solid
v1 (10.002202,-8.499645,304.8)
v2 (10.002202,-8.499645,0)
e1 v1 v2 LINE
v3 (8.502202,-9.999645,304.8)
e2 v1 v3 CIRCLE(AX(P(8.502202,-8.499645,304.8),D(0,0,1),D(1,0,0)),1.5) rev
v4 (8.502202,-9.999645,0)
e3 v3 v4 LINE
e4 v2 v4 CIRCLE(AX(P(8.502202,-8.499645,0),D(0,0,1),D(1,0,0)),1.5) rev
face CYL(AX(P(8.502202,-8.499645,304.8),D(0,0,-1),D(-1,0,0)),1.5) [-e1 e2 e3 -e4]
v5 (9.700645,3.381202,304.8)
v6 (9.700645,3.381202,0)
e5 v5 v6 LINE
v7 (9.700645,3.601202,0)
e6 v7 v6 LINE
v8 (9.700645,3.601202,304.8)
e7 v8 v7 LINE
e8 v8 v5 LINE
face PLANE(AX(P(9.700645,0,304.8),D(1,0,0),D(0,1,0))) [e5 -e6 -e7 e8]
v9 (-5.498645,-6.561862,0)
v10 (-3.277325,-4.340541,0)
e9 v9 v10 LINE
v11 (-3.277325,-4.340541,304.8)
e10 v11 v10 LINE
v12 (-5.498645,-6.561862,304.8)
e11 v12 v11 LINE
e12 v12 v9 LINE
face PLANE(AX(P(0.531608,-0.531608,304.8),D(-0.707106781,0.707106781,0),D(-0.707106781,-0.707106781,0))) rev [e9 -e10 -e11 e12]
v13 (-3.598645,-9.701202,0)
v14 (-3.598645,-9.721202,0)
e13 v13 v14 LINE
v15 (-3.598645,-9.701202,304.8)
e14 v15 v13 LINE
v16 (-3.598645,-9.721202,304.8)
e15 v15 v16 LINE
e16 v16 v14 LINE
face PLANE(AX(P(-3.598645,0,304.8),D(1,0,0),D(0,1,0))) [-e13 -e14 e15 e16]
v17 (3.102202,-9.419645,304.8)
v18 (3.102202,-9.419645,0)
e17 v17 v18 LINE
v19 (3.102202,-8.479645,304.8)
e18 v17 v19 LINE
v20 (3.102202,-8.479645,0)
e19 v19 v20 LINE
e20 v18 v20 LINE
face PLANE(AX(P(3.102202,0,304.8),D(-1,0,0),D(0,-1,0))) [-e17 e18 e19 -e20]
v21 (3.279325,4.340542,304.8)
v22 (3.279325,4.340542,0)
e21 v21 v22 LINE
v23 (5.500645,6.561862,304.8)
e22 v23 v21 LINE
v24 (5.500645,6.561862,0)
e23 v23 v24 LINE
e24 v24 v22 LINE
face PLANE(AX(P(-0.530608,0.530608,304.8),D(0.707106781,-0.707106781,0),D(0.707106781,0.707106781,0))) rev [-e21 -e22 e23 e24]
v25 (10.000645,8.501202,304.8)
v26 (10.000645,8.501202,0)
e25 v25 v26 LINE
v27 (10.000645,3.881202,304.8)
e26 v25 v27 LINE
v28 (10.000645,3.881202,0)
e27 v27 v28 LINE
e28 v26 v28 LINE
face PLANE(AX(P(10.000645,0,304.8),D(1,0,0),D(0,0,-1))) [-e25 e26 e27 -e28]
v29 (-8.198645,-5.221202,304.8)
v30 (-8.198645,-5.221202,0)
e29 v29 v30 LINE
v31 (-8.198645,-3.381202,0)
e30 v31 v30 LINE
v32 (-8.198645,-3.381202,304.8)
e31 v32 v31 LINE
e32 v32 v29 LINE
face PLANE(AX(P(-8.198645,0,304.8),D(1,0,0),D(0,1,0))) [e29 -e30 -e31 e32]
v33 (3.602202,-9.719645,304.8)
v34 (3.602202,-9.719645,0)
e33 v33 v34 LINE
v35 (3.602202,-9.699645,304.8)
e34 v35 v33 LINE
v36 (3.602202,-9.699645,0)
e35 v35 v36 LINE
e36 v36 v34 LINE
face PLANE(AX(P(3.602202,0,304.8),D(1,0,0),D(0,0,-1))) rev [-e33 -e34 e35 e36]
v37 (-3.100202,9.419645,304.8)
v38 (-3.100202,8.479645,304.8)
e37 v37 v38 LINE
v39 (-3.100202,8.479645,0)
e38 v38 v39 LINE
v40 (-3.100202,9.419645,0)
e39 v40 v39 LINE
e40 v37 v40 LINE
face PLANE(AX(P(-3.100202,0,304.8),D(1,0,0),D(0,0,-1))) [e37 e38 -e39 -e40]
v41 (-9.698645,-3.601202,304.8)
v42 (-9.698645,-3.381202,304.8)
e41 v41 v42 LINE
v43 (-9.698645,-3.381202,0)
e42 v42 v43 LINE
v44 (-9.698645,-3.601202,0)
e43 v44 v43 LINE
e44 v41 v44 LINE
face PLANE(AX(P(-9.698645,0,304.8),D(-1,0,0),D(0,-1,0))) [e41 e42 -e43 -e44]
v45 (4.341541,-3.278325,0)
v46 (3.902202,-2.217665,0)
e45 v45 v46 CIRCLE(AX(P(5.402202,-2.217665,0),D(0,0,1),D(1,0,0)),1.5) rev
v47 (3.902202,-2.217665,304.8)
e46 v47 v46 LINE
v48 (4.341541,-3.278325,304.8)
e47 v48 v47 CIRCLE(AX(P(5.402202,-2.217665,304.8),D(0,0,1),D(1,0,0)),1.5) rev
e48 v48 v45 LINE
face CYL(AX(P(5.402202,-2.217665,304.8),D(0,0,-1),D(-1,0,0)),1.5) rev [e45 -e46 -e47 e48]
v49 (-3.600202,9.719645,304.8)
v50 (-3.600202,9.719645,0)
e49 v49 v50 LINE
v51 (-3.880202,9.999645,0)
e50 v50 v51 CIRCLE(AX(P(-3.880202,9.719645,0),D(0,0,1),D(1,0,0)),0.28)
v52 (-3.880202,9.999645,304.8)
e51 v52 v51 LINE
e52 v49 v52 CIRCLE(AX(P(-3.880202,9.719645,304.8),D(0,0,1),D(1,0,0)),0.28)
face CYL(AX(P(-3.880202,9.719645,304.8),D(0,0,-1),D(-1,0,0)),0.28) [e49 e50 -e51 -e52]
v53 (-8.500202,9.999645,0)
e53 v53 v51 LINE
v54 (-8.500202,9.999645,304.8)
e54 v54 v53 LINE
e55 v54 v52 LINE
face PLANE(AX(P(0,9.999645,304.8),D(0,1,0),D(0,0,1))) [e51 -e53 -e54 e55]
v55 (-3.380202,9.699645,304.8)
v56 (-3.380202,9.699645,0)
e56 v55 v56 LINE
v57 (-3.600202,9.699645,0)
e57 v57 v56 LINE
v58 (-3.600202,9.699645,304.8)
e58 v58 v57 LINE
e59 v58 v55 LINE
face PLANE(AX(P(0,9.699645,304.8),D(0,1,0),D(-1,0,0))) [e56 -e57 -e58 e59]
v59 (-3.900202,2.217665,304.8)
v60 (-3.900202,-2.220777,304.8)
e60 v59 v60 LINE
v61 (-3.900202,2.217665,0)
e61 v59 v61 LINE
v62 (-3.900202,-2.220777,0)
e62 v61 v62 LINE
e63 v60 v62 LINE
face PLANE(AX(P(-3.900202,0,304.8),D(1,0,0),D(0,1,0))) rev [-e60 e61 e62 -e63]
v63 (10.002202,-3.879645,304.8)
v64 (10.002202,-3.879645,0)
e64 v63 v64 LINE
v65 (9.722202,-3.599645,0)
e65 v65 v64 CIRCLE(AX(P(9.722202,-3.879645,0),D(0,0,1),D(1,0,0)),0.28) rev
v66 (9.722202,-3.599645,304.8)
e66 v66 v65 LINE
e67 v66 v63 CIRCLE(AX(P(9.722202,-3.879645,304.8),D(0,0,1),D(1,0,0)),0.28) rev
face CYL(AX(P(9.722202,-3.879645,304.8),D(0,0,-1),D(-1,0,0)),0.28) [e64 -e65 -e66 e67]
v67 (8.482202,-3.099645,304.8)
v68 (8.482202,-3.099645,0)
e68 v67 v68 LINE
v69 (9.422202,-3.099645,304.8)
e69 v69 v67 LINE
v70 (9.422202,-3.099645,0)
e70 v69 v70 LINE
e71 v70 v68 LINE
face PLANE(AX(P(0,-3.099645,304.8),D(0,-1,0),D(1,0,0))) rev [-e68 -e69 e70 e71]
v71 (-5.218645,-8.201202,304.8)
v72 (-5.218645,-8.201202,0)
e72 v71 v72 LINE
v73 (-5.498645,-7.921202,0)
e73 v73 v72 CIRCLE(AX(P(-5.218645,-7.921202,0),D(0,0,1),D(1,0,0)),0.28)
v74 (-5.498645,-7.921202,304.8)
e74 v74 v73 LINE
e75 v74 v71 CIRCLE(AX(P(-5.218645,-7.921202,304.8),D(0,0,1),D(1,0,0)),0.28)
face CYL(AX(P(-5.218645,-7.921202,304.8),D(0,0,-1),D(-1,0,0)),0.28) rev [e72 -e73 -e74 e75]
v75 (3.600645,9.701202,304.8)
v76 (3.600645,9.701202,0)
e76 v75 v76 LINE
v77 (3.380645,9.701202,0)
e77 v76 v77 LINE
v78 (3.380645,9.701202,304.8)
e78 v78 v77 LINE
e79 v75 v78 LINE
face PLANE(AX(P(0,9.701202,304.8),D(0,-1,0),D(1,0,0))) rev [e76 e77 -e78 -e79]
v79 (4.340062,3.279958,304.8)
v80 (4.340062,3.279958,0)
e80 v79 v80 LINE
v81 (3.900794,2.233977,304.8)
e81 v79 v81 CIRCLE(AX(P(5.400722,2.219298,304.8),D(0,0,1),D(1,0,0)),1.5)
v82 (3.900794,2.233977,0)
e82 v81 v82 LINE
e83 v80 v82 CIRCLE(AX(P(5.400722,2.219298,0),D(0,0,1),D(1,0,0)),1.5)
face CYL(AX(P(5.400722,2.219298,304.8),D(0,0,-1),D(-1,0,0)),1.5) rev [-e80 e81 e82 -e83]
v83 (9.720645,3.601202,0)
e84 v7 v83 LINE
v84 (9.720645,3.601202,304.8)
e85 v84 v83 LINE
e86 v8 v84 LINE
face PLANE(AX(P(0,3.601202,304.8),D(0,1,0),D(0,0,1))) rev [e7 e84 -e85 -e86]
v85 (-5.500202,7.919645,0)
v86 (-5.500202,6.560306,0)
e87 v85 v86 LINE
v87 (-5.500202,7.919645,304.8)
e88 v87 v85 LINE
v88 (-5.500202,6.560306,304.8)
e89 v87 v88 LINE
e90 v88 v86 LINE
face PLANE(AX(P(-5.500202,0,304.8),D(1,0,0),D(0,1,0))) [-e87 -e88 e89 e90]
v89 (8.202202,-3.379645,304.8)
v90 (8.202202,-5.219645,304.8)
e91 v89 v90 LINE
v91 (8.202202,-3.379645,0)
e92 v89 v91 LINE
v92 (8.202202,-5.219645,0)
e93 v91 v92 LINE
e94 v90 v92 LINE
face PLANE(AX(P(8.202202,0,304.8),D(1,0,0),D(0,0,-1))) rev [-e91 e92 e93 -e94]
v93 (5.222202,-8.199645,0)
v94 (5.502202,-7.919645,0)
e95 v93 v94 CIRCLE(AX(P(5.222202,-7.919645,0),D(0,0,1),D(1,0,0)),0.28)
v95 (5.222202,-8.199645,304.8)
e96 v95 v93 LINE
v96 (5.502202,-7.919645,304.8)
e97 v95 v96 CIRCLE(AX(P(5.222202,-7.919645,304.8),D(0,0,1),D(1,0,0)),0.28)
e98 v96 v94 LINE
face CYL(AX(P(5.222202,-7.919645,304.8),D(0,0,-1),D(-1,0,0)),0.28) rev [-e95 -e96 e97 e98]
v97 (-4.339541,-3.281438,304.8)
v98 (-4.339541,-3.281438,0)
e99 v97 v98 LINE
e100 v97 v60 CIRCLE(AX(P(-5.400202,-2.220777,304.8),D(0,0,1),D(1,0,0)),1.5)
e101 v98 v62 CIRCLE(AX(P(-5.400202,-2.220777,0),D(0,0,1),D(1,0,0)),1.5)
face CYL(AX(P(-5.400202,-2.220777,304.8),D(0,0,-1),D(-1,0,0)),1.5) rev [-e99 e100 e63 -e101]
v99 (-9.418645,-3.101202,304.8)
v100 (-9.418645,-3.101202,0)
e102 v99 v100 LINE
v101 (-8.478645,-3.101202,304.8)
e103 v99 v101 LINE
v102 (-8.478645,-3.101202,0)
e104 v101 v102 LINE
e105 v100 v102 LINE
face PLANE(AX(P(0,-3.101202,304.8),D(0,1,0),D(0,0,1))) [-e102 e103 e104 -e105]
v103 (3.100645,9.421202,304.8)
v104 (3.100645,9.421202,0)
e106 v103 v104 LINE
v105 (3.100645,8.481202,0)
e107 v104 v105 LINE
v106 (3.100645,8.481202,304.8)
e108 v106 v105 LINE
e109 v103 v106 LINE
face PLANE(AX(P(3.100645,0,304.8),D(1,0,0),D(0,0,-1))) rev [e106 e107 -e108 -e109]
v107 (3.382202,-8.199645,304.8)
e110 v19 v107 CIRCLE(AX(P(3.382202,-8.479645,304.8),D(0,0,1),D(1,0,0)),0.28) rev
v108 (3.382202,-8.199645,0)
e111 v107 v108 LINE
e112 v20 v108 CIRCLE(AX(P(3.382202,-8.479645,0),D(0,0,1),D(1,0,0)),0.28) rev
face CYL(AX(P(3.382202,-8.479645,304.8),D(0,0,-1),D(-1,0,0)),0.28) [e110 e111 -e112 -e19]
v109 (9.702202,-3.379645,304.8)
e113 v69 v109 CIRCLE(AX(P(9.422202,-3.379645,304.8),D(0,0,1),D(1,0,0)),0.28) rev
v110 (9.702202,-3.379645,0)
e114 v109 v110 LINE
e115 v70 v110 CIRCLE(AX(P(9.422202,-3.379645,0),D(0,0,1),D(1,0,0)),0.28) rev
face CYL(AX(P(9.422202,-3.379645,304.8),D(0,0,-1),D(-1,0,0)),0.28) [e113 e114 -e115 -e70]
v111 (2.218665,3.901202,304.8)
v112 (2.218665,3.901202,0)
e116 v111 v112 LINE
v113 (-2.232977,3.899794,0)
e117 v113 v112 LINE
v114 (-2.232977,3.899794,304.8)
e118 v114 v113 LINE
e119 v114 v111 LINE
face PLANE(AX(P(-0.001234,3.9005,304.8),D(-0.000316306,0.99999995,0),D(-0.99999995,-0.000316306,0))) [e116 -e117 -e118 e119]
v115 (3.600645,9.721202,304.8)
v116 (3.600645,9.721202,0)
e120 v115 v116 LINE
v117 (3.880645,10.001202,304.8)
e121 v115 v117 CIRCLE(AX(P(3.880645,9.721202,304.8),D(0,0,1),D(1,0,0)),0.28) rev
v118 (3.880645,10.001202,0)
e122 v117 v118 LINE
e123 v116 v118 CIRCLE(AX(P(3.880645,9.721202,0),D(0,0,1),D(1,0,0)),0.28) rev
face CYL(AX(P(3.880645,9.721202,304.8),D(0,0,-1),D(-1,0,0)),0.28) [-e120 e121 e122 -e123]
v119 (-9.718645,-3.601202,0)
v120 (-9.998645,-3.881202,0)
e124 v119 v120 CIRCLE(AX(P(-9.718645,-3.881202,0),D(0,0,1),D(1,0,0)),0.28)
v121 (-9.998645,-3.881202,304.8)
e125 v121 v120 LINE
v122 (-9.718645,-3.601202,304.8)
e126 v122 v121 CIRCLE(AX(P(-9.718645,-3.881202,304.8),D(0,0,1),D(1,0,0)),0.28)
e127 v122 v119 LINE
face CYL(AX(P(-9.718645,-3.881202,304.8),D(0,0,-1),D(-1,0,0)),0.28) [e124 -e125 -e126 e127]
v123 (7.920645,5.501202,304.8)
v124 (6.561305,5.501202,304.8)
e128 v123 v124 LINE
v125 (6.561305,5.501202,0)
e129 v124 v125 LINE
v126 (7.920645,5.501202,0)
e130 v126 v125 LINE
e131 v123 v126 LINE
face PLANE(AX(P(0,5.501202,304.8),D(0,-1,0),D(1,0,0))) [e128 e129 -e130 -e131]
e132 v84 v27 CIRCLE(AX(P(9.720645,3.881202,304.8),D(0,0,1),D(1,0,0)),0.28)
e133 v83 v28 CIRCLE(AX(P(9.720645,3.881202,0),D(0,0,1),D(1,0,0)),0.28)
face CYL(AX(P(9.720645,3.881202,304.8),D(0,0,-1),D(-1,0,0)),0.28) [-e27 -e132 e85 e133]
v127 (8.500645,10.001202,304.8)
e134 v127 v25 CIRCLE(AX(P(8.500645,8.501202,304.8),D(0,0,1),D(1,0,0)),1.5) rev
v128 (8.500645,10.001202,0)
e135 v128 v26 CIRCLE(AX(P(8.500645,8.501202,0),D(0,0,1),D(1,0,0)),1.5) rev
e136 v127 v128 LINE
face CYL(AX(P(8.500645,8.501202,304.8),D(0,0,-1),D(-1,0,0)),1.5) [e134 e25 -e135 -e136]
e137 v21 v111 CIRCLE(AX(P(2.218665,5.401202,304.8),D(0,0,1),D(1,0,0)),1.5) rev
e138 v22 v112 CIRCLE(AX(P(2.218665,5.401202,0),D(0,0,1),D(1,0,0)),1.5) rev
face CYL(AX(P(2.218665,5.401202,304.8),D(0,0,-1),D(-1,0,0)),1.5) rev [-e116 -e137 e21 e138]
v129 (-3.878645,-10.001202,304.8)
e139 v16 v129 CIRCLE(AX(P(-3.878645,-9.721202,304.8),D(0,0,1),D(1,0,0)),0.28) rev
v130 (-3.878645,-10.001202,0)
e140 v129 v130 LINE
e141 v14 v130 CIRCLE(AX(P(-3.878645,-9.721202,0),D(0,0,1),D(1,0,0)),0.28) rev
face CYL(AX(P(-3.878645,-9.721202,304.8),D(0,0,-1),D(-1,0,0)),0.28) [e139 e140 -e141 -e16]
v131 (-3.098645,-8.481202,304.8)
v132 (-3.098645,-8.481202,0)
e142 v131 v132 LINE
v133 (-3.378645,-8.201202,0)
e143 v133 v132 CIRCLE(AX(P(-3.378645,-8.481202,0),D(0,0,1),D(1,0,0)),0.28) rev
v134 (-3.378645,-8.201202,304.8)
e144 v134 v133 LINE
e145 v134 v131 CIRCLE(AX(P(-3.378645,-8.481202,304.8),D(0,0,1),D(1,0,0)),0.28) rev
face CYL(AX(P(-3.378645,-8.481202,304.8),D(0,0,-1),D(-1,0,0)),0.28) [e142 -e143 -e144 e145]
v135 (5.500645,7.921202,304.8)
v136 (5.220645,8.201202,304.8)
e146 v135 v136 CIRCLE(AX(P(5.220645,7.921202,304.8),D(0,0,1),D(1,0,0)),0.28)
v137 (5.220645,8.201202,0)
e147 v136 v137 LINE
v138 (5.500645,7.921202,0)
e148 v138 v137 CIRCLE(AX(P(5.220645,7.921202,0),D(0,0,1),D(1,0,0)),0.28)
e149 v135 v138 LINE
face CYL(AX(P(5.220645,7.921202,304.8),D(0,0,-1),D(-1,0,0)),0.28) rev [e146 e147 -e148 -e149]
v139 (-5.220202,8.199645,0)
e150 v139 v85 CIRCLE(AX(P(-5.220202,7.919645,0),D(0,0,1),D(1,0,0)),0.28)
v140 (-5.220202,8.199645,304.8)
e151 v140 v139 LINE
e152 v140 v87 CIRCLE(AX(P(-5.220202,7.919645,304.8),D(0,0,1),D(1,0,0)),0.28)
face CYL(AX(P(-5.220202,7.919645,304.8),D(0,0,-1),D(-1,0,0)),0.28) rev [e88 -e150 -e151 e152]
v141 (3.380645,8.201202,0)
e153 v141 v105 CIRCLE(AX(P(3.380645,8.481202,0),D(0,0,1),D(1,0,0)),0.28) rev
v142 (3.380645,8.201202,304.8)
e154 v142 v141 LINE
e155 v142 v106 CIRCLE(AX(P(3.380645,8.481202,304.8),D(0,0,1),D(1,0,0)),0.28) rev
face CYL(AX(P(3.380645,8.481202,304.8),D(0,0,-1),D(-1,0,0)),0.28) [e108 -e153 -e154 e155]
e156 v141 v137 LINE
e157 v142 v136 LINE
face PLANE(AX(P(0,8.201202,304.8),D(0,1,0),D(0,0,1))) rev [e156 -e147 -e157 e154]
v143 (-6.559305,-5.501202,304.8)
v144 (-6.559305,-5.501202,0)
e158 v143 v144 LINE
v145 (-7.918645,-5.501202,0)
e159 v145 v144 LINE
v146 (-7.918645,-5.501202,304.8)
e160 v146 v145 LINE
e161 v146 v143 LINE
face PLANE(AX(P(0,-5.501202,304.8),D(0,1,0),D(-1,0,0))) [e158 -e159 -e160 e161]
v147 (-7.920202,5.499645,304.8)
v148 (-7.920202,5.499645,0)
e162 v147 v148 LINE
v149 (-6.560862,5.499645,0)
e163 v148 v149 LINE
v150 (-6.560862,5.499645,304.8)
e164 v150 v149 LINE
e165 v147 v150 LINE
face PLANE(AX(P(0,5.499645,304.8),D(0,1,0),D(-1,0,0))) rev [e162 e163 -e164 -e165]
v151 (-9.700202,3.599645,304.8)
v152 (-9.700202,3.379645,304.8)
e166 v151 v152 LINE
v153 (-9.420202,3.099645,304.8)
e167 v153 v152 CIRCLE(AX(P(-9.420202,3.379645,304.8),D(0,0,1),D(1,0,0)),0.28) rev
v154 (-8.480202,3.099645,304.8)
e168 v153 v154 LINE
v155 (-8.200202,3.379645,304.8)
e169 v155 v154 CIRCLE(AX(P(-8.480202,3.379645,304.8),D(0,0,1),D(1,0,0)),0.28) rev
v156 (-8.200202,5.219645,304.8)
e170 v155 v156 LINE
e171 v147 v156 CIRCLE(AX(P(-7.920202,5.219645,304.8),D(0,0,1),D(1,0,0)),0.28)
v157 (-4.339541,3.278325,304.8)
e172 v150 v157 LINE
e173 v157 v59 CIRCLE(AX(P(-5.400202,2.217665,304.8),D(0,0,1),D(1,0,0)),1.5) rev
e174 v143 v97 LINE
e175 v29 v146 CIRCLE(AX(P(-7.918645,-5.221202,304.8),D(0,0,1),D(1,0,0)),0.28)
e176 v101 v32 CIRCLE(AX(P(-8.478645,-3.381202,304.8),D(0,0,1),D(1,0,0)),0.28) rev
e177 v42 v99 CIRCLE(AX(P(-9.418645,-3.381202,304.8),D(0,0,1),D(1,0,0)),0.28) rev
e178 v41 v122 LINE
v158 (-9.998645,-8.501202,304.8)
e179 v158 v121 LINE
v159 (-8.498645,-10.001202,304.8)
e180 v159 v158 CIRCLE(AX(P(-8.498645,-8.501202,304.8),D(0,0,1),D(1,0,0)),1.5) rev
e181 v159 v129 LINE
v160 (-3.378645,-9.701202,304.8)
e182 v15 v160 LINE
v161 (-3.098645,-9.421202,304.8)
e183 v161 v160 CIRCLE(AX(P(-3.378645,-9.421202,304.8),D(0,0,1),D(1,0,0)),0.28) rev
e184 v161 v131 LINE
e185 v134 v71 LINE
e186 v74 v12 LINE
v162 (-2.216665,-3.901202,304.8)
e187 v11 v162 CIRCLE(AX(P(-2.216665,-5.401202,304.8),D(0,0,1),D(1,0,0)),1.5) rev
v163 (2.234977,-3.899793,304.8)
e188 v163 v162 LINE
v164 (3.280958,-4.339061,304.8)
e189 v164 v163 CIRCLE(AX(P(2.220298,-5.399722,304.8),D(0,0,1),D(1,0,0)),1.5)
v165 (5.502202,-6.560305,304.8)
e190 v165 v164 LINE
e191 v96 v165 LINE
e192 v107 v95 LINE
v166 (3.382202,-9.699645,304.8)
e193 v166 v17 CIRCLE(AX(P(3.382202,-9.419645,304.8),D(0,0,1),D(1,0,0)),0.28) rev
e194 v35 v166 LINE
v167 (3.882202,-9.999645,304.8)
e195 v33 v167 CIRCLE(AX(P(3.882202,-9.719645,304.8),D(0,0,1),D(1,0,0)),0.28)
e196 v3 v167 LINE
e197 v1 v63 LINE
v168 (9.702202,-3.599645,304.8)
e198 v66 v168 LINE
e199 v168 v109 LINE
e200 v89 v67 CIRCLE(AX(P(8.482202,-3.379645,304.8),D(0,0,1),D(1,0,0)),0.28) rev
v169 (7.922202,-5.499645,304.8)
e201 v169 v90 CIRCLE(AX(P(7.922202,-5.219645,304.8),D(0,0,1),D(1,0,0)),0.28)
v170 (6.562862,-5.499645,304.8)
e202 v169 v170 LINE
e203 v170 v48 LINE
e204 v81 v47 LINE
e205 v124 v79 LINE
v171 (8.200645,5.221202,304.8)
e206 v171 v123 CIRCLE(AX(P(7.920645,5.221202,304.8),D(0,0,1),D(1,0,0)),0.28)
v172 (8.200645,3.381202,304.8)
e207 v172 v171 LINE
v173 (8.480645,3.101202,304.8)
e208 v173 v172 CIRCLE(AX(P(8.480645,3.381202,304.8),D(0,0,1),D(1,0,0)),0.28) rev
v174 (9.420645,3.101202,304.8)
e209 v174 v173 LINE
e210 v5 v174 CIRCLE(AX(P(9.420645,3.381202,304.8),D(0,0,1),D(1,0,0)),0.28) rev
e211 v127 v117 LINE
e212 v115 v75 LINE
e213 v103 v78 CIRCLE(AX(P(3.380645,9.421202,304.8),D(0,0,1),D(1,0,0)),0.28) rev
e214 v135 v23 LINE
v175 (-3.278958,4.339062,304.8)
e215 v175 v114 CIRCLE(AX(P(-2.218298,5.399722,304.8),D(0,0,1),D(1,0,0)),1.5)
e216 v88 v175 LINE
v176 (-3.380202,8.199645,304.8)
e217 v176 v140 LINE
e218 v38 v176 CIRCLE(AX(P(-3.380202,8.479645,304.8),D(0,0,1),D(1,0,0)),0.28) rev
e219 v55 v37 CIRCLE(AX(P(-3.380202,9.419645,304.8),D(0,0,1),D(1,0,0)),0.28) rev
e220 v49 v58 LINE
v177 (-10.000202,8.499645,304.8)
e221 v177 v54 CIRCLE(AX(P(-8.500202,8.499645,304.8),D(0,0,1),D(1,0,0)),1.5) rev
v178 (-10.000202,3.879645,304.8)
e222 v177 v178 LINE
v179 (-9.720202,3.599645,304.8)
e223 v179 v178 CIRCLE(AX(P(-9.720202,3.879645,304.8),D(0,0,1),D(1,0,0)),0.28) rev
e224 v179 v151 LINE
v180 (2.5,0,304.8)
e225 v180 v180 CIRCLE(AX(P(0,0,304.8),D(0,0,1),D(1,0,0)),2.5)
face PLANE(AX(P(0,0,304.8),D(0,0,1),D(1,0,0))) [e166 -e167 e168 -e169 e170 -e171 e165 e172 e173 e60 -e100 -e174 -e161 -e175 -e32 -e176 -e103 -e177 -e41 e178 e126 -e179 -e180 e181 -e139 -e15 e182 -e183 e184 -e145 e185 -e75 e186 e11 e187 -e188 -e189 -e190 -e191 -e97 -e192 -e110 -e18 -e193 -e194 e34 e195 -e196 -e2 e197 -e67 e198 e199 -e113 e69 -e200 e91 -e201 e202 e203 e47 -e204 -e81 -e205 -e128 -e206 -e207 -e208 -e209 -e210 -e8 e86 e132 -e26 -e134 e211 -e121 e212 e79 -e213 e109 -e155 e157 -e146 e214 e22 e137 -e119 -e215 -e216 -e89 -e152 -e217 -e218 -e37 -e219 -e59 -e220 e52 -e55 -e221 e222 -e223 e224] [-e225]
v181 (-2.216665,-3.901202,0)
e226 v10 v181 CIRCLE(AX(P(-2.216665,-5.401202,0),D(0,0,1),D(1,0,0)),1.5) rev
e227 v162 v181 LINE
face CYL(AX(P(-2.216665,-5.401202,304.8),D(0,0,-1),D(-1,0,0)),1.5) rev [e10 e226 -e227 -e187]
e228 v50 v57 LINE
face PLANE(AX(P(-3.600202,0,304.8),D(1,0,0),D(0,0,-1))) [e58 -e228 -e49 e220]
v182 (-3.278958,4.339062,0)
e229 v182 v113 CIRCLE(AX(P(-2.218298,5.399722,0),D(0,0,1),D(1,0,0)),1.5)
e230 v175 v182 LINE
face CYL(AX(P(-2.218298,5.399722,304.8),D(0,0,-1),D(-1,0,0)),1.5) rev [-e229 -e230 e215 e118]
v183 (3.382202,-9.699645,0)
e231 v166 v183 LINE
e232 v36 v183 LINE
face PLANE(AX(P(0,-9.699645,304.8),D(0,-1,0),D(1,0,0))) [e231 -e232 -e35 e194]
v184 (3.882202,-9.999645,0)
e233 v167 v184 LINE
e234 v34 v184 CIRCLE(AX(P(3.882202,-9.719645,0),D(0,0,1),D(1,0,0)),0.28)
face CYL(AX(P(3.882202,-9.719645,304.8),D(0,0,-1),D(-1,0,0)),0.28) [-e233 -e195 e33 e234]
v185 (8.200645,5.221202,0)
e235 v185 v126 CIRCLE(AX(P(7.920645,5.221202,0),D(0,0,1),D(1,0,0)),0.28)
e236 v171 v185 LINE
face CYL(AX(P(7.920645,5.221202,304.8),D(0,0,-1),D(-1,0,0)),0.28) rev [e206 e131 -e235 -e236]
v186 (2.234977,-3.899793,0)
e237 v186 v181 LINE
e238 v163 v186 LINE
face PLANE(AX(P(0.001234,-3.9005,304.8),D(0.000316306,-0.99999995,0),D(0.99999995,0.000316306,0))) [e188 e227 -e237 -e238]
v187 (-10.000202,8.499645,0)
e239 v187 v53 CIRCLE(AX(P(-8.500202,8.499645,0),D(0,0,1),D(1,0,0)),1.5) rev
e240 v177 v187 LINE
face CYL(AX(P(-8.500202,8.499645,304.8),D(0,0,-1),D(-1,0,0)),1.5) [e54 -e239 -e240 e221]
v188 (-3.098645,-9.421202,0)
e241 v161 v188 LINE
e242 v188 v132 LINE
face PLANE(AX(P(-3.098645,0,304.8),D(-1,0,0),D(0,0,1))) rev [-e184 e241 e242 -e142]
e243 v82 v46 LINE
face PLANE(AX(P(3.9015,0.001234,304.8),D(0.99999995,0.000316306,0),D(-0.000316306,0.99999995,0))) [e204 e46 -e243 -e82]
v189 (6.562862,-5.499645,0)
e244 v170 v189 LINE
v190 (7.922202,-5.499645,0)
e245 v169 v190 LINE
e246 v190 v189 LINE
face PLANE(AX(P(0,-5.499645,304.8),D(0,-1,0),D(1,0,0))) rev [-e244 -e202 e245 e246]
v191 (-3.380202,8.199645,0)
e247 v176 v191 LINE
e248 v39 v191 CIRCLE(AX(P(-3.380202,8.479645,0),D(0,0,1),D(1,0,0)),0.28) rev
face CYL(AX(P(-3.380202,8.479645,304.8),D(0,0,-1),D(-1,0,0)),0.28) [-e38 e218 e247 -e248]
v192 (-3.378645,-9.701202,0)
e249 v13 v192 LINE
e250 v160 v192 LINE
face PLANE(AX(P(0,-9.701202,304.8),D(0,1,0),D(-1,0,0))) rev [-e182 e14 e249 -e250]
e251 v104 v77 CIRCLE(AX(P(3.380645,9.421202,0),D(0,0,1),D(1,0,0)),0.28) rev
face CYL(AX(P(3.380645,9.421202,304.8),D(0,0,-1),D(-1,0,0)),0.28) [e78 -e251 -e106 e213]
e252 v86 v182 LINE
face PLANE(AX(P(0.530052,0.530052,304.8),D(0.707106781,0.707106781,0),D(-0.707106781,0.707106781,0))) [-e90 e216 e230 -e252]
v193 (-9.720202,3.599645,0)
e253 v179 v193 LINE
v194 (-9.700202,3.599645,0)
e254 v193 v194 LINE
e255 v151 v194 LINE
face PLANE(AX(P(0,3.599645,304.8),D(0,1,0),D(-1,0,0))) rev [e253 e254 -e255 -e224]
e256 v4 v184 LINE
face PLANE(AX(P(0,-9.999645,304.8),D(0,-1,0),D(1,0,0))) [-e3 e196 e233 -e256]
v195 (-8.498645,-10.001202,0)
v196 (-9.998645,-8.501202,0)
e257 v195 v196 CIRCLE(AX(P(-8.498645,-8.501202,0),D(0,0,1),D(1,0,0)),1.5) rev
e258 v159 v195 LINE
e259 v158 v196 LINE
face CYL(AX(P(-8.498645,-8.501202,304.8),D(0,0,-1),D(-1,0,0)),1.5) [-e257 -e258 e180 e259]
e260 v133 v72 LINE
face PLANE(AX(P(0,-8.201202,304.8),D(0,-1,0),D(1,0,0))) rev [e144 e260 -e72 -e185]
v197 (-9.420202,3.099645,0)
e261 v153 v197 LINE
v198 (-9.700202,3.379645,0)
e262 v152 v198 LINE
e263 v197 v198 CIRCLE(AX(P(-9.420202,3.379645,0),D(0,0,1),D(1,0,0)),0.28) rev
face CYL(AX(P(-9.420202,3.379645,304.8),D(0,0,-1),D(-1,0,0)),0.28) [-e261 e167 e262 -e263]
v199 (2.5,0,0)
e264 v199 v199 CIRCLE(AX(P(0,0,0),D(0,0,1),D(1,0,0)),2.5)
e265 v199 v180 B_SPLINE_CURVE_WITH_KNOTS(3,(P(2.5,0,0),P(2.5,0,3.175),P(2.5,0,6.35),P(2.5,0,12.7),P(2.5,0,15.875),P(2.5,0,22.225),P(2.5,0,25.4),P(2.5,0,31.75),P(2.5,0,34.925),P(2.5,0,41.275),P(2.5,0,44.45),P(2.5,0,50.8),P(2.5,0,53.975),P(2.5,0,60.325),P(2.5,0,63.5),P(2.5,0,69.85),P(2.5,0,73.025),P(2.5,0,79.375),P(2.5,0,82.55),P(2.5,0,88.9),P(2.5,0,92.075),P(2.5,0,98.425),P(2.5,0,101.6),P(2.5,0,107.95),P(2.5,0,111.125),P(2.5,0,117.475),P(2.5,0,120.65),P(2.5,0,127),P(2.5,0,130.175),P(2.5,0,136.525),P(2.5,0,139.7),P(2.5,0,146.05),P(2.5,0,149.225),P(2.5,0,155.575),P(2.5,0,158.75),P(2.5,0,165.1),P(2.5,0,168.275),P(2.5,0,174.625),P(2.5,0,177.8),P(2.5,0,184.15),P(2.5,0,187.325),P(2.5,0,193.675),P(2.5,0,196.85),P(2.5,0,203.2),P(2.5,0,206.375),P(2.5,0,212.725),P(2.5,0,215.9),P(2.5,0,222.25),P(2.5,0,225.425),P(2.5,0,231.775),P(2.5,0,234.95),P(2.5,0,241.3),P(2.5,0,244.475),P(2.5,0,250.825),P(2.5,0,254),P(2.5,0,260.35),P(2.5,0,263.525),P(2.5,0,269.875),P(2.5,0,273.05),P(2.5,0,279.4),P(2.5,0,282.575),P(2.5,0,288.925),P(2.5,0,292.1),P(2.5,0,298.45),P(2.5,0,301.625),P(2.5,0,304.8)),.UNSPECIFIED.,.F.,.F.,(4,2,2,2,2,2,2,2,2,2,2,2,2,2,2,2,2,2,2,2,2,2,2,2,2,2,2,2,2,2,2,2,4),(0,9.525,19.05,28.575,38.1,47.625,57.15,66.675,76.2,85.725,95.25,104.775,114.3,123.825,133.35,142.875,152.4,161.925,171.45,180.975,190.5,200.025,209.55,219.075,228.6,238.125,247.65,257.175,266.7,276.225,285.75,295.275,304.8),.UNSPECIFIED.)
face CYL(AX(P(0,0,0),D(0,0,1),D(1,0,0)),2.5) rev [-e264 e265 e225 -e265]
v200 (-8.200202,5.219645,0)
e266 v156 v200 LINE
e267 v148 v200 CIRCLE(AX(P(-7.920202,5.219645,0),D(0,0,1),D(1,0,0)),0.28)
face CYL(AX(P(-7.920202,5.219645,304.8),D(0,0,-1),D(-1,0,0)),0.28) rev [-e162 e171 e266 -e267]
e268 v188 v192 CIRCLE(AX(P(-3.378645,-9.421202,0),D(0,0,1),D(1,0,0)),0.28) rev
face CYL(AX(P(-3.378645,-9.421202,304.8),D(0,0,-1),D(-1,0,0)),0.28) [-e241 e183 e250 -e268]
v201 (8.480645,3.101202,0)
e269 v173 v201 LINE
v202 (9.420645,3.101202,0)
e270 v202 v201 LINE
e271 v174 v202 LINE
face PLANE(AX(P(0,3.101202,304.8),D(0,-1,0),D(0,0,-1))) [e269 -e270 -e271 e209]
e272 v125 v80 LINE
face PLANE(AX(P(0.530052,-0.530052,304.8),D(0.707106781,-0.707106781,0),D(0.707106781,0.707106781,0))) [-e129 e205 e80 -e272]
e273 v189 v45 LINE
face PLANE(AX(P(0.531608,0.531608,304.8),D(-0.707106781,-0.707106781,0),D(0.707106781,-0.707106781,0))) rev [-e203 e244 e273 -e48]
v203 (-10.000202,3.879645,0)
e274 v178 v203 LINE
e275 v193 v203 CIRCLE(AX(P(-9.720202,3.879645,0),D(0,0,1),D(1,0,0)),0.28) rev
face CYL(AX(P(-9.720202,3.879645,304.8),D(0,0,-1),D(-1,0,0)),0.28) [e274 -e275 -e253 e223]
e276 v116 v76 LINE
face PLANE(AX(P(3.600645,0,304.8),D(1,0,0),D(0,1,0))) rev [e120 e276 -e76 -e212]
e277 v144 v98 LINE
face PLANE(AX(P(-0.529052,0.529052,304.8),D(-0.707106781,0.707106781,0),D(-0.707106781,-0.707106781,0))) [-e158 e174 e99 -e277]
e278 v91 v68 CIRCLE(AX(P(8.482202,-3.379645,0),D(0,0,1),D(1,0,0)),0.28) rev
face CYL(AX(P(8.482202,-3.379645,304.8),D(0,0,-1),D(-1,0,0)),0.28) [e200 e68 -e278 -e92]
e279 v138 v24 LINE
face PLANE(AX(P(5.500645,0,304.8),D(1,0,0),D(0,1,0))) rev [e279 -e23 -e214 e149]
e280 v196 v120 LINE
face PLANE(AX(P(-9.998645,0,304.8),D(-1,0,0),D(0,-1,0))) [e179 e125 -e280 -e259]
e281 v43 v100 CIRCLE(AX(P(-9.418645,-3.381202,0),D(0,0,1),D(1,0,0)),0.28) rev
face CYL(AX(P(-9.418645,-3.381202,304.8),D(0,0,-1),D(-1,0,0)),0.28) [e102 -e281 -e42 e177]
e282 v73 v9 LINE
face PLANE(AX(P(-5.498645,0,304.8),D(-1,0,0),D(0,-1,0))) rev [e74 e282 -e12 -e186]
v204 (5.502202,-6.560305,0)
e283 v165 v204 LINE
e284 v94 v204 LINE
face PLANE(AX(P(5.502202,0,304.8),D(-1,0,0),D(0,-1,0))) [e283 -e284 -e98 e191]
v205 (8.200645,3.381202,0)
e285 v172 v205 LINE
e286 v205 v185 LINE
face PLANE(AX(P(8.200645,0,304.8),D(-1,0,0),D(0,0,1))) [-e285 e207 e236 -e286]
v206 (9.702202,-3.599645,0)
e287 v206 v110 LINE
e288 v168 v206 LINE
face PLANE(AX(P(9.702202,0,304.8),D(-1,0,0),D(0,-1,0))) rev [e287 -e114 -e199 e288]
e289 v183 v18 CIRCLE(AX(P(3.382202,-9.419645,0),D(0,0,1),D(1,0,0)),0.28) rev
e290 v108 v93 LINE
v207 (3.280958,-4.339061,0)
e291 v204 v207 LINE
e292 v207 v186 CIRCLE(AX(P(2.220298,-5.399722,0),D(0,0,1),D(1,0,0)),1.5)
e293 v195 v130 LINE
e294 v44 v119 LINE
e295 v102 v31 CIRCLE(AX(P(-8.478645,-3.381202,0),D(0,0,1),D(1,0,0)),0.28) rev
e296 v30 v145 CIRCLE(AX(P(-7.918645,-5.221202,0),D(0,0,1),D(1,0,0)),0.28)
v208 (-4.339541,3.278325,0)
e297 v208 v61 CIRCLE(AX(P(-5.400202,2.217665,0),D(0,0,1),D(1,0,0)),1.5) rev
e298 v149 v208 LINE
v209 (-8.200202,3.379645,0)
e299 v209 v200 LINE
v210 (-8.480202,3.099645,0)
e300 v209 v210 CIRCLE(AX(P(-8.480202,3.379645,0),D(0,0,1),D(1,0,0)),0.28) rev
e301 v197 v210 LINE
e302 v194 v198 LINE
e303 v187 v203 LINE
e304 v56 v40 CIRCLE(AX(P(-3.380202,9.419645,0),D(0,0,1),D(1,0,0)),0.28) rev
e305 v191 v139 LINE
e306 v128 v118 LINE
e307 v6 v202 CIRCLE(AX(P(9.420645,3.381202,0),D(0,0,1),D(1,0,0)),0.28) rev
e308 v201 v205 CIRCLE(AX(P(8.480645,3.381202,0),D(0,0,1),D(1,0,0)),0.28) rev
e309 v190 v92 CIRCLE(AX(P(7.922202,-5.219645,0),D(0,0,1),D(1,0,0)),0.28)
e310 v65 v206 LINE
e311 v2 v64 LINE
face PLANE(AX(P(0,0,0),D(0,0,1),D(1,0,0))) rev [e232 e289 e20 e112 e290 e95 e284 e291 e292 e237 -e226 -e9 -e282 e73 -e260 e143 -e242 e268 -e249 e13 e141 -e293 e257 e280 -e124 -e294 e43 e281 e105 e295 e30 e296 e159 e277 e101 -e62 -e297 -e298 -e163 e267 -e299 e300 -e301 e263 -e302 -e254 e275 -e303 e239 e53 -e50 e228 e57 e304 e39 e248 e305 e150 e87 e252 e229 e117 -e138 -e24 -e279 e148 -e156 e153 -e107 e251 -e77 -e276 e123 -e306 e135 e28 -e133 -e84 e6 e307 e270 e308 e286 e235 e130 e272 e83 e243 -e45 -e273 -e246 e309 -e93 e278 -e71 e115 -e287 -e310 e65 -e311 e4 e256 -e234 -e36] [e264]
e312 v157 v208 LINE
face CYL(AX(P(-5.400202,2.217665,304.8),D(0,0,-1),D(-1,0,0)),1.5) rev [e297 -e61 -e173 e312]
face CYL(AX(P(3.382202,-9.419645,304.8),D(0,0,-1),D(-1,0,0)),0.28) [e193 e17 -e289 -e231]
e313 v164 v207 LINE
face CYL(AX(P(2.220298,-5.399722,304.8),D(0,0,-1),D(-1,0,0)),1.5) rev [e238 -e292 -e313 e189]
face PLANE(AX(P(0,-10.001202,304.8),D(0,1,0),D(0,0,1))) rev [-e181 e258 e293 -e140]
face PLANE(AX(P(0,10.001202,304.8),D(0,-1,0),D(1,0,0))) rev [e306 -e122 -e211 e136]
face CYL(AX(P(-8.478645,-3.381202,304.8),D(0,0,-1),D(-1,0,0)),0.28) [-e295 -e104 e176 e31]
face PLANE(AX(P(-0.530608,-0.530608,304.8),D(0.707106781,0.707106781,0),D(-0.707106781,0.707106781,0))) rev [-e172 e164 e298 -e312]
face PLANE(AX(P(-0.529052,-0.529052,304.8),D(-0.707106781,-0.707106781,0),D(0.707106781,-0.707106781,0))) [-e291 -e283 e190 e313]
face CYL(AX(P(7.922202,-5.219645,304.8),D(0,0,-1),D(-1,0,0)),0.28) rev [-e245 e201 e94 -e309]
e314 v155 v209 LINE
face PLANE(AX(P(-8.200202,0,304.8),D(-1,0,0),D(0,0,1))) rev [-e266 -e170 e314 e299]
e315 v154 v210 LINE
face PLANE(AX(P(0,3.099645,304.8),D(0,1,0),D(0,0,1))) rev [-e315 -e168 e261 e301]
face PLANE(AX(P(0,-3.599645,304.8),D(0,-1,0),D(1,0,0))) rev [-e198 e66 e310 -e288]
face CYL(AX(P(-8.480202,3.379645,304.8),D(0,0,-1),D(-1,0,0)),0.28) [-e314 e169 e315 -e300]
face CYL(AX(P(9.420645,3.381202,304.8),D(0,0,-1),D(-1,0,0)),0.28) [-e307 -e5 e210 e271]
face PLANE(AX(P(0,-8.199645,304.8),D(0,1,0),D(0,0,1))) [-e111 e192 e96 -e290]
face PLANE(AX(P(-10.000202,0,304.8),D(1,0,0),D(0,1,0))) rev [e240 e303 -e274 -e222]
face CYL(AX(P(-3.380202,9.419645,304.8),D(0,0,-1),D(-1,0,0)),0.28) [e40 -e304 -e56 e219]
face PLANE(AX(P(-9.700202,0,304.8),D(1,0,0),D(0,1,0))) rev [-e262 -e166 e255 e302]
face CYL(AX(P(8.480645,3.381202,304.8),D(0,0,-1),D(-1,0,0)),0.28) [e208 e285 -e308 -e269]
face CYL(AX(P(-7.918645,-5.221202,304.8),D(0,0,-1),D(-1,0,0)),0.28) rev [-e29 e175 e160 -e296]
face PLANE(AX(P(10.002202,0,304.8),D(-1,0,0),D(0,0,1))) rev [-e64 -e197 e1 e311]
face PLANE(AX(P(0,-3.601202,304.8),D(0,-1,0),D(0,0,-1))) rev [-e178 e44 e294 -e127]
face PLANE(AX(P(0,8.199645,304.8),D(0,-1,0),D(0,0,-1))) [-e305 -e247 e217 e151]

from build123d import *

# Parameters (mm, degrees)
BOSS_EXTRUDE1_DEPTH = 304.8
F_3DSKETCH2_R       = 2.5
CUT_EXTRUDE1_DEPTH  = 306.128019157


with BuildPart() as part:
    # Sketch1 → Boss-Extrude1 (new body)
    with BuildSketch(Plane.XY):
        with BuildLine():
            ThreePointArc((-4.339541497, 3.27832502), (-4.01438237, 2.791689997), (-3.900201668, 2.217664848))
            Line((-3.900201668, 2.217664848), (-3.900201668, -2.220777458))
            ThreePointArc((-3.900201668, -2.220777458), (-4.013982246, -2.793835668), (-4.338062619, -3.279956687))
            ThreePointArc((-4.338062619, -3.279956687), (-4.338801799, -3.280697416), (-4.339541497, -3.28143763))
            Line((-4.339541497, -3.28143763), (-6.559305445, -5.501201578))
            Line((-6.559305445, -5.501201578), (-7.918645273, -5.501201578))
            ThreePointArc((-7.918645273, -5.501201578), (-8.116635172, -5.419191476), (-8.198645273, -5.221201578))
            Line((-8.198645273, -5.221201578), (-8.198645273, -3.381201578))
            ThreePointArc((-8.198645273, -3.381201578), (-8.280655374, -3.183211679), (-8.478645273, -3.101201578))
            Line((-8.478645273, -3.101201578), (-9.418645273, -3.101201578))
            ThreePointArc((-9.418645273, -3.101201578), (-9.616635172, -3.183211679), (-9.698645273, -3.381201578))
            Line((-9.698645273, -3.381201578), (-9.698645273, -3.601201578))
            Line((-9.698645273, -3.601201578), (-9.718645273, -3.601201578))
            ThreePointArc((-9.718645273, -3.601201578), (-9.916635172, -3.683211679), (-9.998645273, -3.881201578))
            Line((-9.998645273, -3.881201578), (-9.998645273, -8.501201578))
            ThreePointArc((-9.998645273, -8.501201578), (-9.559305445, -9.561861749), (-8.498645273, -10.001201578))
            Line((-8.498645273, -10.001201578), (-3.878645273, -10.001201578))
            ThreePointArc((-3.878645273, -10.001201578), (-3.680655374, -9.919191476), (-3.598645273, -9.721201578))
            Line((-3.598645273, -9.721201578), (-3.598645273, -9.701201578))
            Line((-3.598645273, -9.701201578), (-3.378645273, -9.701201578))
            ThreePointArc((-3.378645273, -9.701201578), (-3.180655374, -9.619191476), (-3.098645273, -9.421201578))
            Line((-3.098645273, -9.421201578), (-3.098645273, -8.481201578))
            ThreePointArc((-3.098645273, -8.481201578), (-3.180655374, -8.283211679), (-3.378645273, -8.201201578))
            Line((-3.378645273, -8.201201578), (-5.218645273, -8.201201578))
            ThreePointArc((-5.218645273, -8.201201578), (-5.416635172, -8.119191476), (-5.498645273, -7.921201578))
            Line((-5.498645273, -7.921201578), (-5.498645273, -6.561861749))
            Line((-5.498645273, -6.561861749), (-3.277324929, -4.340541406))
            ThreePointArc((-3.277324929, -4.340541406), (-2.790689906, -4.015382279), (-2.216664757, -3.901201578))
            Line((-2.216664757, -3.901201578), (2.234977304, -3.899793498))
            ThreePointArc((2.234977304, -3.899793498), (2.801097117, -4.016727825), (3.280957809, -4.339061494))
            Line((3.280957809, -4.339061494), (5.502201668, -6.560305354))
            Line((5.502201668, -6.560305354), (5.502201668, -7.919645182))
            ThreePointArc((5.502201668, -7.919645182), (5.420191567, -8.117635081), (5.222201668, -8.199645182))
            Line((5.222201668, -8.199645182), (3.382201668, -8.199645182))
            ThreePointArc((3.382201668, -8.199645182), (3.18421177, -8.281655283), (3.102201668, -8.479645182))
            Line((3.102201668, -8.479645182), (3.102201668, -9.419645182))
            ThreePointArc((3.102201668, -9.419645182), (3.18421177, -9.617635081), (3.382201668, -9.699645182))
            Line((3.382201668, -9.699645182), (3.602201668, -9.699645182))
            Line((3.602201668, -9.699645182), (3.602201668, -9.719645182))
            ThreePointArc((3.602201668, -9.719645182), (3.68421177, -9.917635081), (3.882201668, -9.999645182))
            Line((3.882201668, -9.999645182), (8.502201668, -9.999645182))
            ThreePointArc((8.502201668, -9.999645182), (9.56286184, -9.560305354), (10.002201668, -8.499645182))
            Line((10.002201668, -8.499645182), (10.002201668, -3.879645182))
            ThreePointArc((10.002201668, -3.879645182), (9.920191567, -3.681655283), (9.722201668, -3.599645182))
            Line((9.722201668, -3.599645182), (9.702201668, -3.599645182))
            Line((9.702201668, -3.599645182), (9.702201668, -3.379645182))
            ThreePointArc((9.702201668, -3.379645182), (9.620191567, -3.181655283), (9.422201668, -3.099645182))
            Line((9.422201668, -3.099645182), (8.482201668, -3.099645182))
            ThreePointArc((8.482201668, -3.099645182), (8.28421177, -3.181655283), (8.202201668, -3.379645182))
            Line((8.202201668, -3.379645182), (8.202201668, -5.219645182))
            ThreePointArc((8.202201668, -5.219645182), (8.120191567, -5.417635081), (7.922201668, -5.499645182))
            Line((7.922201668, -5.499645182), (6.56286184, -5.499645182))
            Line((6.56286184, -5.499645182), (4.341541497, -3.278324838))
            ThreePointArc((4.341541497, -3.278324838), (4.01638237, -2.791689815), (3.902201668, -2.217664667))
            Line((3.902201668, -2.217664667), (3.900793589, 2.233977395))
            ThreePointArc((3.900793589, 2.233977395), (4.017727916, 2.800097207), (4.340061585, 3.2799579))
            Line((4.340061585, 3.2799579), (6.561305445, 5.501201759))
            Line((6.561305445, 5.501201759), (7.920645273, 5.501201759))
            ThreePointArc((7.920645273, 5.501201759), (8.118635172, 5.419191658), (8.200645273, 5.221201759))
            Line((8.200645273, 5.221201759), (8.200645273, 3.381201759))
            ThreePointArc((8.200645273, 3.381201759), (8.282655374, 3.183211861), (8.480645273, 3.101201759))
            Line((8.480645273, 3.101201759), (9.420645273, 3.101201759))
            ThreePointArc((9.420645273, 3.101201759), (9.618635172, 3.183211861), (9.700645273, 3.381201759))
            Line((9.700645273, 3.381201759), (9.700645273, 3.601201759))
            Line((9.700645273, 3.601201759), (9.720645273, 3.601201759))
            ThreePointArc((9.720645273, 3.601201759), (9.918635172, 3.683211861), (10.000645273, 3.881201759))
            Line((10.000645273, 3.881201759), (10.000645273, 8.501201759))
            ThreePointArc((10.000645273, 8.501201759), (9.561305445, 9.561861931), (8.500645273, 10.001201759))
            Line((8.500645273, 10.001201759), (3.880645273, 10.001201759))
            ThreePointArc((3.880645273, 10.001201759), (3.682655374, 9.919191658), (3.600645273, 9.721201759))
            Line((3.600645273, 9.721201759), (3.600645273, 9.701201759))
            Line((3.600645273, 9.701201759), (3.380645273, 9.701201759))
            ThreePointArc((3.380645273, 9.701201759), (3.182655374, 9.619191658), (3.100645273, 9.421201759))
            Line((3.100645273, 9.421201759), (3.100645273, 8.481201759))
            ThreePointArc((3.100645273, 8.481201759), (3.182655374, 8.283211861), (3.380645273, 8.201201759))
            Line((3.380645273, 8.201201759), (5.220645273, 8.201201759))
            ThreePointArc((5.220645273, 8.201201759), (5.418635172, 8.119191658), (5.500645273, 7.921201759))
            Line((5.500645273, 7.921201759), (5.500645273, 6.561861931))
            Line((5.500645273, 6.561861931), (3.279324929, 4.340541588))
            ThreePointArc((3.279324929, 4.340541588), (2.792689906, 4.015382461), (2.218664757, 3.901201759))
            Line((2.218664757, 3.901201759), (-2.232977304, 3.89979368))
            ThreePointArc((-2.232977304, 3.89979368), (-2.799097117, 4.016728006), (-3.278957809, 4.339061676))
            Line((-3.278957809, 4.339061676), (-5.500201668, 6.560305535))
            Line((-5.500201668, 6.560305535), (-5.500201668, 7.919645364))
            ThreePointArc((-5.500201668, 7.919645364), (-5.418191567, 8.117635262), (-5.220201668, 8.199645364))
            Line((-5.220201668, 8.199645364), (-3.380201668, 8.199645364))
            ThreePointArc((-3.380201668, 8.199645364), (-3.18221177, 8.281655465), (-3.100201668, 8.479645364))
            Line((-3.100201668, 8.479645364), (-3.100201668, 9.419645364))
            ThreePointArc((-3.100201668, 9.419645364), (-3.18221177, 9.617635262), (-3.380201668, 9.699645364))
            Line((-3.380201668, 9.699645364), (-3.600201668, 9.699645364))
            Line((-3.600201668, 9.699645364), (-3.600201668, 9.719645364))
            ThreePointArc((-3.600201668, 9.719645364), (-3.68221177, 9.917635262), (-3.880201668, 9.999645364))
            Line((-3.880201668, 9.999645364), (-8.500201668, 9.999645364))
            ThreePointArc((-8.500201668, 9.999645364), (-9.56086184, 9.560305535), (-10.000201668, 8.499645364))
            Line((-10.000201668, 8.499645364), (-10.000201668, 3.879645364))
            ThreePointArc((-10.000201668, 3.879645364), (-9.918191567, 3.681655465), (-9.720201668, 3.599645364))
            Line((-9.720201668, 3.599645364), (-9.700201668, 3.599645364))
            Line((-9.700201668, 3.599645364), (-9.700201668, 3.379645364))
            ThreePointArc((-9.700201668, 3.379645364), (-9.618191567, 3.181655465), (-9.420201668, 3.099645364))
            Line((-9.420201668, 3.099645364), (-8.480201668, 3.099645364))
            ThreePointArc((-8.480201668, 3.099645364), (-8.28221177, 3.181655465), (-8.200201668, 3.379645364))
            Line((-8.200201668, 3.379645364), (-8.200201668, 5.219645364))
            ThreePointArc((-8.200201668, 5.219645364), (-8.118191567, 5.417635262), (-7.920201668, 5.499645364))
            Line((-7.920201668, 5.499645364), (-6.56086184, 5.499645364))
            Line((-6.56086184, 5.499645364), (-4.339541497, 3.27832502))
        make_face()
    extrude(amount=BOSS_EXTRUDE1_DEPTH)

    # 3DSketch2 → Cut-Extrude1 (cut, through all)
    with BuildSketch(Plane.XY):
        Circle(F_3DSKETCH2_R)
    extrude(amount=CUT_EXTRUDE1_DEPTH, mode=Mode.SUBTRACT)


solid = part.part
